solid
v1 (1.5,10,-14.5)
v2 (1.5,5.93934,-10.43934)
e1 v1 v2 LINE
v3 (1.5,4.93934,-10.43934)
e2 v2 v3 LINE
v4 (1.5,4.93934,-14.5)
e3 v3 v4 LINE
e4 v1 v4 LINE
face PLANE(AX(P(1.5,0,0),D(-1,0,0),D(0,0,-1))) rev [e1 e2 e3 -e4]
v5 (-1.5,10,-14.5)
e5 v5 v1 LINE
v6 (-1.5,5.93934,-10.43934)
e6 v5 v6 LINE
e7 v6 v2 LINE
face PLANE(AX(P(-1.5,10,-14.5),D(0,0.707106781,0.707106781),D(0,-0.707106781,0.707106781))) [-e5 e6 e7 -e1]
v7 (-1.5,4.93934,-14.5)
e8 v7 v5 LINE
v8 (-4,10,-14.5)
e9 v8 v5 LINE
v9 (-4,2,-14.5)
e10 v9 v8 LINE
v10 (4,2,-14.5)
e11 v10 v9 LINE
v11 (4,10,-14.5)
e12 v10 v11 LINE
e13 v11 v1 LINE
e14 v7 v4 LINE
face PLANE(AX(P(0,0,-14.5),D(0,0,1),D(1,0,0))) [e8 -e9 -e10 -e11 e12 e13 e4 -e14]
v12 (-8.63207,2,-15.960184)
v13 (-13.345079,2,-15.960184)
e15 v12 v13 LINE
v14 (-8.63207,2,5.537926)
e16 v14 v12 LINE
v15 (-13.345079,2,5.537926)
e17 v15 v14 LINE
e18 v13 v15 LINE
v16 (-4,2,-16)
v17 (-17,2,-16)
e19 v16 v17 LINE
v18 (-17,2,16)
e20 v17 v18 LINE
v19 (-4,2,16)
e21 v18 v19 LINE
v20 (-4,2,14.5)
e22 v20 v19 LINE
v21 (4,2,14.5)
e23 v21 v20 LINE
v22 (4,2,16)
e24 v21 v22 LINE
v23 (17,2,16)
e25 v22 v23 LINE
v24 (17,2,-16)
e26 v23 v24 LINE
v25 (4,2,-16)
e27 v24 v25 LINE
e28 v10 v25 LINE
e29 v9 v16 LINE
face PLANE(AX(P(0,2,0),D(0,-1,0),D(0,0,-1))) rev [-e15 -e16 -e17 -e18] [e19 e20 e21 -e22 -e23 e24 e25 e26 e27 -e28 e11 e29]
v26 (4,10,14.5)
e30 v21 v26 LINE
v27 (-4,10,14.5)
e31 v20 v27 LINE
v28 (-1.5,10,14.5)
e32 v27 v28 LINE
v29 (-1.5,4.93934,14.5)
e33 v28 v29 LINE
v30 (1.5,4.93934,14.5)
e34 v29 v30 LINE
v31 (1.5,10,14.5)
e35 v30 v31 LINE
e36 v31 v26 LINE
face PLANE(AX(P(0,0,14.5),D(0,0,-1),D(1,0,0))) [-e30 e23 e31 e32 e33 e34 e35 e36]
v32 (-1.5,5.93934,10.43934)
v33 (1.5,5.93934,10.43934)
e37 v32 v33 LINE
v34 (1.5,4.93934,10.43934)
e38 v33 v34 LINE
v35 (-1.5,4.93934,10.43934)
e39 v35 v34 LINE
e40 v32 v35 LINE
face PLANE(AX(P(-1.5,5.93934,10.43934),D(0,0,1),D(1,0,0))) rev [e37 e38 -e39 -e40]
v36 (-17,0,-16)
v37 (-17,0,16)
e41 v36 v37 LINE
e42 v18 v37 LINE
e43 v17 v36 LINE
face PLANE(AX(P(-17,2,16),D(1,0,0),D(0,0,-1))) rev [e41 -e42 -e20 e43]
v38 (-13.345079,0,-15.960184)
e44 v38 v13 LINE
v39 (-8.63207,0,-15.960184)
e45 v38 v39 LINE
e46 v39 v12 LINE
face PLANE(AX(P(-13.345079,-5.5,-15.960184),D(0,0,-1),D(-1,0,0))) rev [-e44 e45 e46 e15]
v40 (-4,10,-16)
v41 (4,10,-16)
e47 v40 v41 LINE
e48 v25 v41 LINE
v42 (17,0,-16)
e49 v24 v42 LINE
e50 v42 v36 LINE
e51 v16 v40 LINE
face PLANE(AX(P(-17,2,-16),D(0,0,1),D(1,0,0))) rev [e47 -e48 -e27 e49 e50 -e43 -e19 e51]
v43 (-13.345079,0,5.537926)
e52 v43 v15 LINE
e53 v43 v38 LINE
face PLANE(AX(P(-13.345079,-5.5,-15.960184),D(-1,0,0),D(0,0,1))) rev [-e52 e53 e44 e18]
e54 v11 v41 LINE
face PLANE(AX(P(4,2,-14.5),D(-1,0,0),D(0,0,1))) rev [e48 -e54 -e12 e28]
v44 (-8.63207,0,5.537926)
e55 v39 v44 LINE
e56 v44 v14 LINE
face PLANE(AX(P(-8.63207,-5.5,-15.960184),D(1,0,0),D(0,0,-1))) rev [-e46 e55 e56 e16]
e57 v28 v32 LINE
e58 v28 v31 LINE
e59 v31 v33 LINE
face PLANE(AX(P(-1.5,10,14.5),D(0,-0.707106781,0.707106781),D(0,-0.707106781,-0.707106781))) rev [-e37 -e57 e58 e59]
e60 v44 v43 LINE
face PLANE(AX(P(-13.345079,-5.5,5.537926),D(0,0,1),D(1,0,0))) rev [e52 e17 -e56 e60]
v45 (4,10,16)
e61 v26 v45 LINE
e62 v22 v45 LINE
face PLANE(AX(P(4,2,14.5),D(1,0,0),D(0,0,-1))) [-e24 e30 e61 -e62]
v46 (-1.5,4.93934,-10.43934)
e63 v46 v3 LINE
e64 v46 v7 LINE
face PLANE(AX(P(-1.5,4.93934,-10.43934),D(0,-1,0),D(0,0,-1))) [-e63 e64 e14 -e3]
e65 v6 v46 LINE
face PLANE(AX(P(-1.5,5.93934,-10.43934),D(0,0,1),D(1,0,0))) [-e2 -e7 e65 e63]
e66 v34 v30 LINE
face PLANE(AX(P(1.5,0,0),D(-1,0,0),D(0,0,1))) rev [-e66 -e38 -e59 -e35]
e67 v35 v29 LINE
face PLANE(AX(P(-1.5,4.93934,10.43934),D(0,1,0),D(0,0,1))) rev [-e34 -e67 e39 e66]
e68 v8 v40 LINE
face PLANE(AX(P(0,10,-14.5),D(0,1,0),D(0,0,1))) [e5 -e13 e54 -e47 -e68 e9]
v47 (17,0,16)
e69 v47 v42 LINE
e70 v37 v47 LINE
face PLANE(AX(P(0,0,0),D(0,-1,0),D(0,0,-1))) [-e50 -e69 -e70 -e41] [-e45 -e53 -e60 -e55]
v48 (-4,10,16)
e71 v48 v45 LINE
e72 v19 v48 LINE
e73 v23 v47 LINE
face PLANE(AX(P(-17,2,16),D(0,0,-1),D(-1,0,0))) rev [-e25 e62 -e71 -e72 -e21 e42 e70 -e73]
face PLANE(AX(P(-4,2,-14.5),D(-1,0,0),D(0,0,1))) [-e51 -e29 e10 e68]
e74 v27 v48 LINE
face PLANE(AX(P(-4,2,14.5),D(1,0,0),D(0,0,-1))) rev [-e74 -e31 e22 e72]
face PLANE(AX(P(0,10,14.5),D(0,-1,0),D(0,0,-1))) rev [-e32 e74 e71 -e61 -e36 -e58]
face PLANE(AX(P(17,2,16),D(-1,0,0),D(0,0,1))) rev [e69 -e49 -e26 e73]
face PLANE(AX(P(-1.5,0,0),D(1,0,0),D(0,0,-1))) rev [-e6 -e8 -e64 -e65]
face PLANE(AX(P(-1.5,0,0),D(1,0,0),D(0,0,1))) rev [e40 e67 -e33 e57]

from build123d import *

# Parameters (mm, degrees)
SKETCH1_W           = 34
SKETCH1_H           = 32
BOSS_EXTRUDE1_DEPTH = 2
SKETCH4_W           = 4
SKETCH4_H           = 8
BOSS_EXTRUDE2_DEPTH = 1.5
BOSS_EXTRUDE5_DEPTH = 1.5
MIRROR1_START       = -4
MIRROR1_OUTLINE_W   = 8
MIRROR1_OUTLINE_H   = 1.5
MIRROR1_DEPTH       = 8
MIRROR1_START_2     = -1.5
MIRROR1_2_DEPTH     = 3
SKETCH7_W           = 4.713008878
SKETCH7_H           = 21.4981103
CUT_EXTRUDE1_DEPTH  = 7.5


# Read off the part's stored shape, not the designer's step: Mirror1
with BuildPart() as part:
    # Sketch1 → Boss-Extrude1 (new body)
    with BuildSketch(Plane(origin=(0, 0, 0), x_dir=(1, 0, 0), z_dir=(0, 1, 0))):
        Rectangle(SKETCH1_W, SKETCH1_H)
    extrude(amount=BOSS_EXTRUDE1_DEPTH)

    # Sketch4 → Boss-Extrude2 (add)
    with BuildSketch(Plane(origin=(0, 0, -16), x_dir=(-1, 0, 0), z_dir=(0, 0, -1))):
        with Locations((2, 6)):
            Rectangle(SKETCH4_W, SKETCH4_H)
    extrude(amount=-BOSS_EXTRUDE2_DEPTH)

    # Sketch5 → Boss-Extrude5 (add)
    with BuildSketch(Plane(origin=(0, 0, 0), x_dir=(0, 0, -1), z_dir=(1, 0, 0))):
        Polygon((14.5, 10), (10.439339828, 5.939339828), (10.439339828, 4.939339828), (14.5, 4.939339828), (14.5, 2), (16, 2), (16, 10), align=None)
    extrude(amount=-BOSS_EXTRUDE5_DEPTH)

    # Mirror1 outline → Mirror1 (add)
    with BuildSketch(Plane.YZ.offset(MIRROR1_START)):
        with Locations((6, 15.25)):
            Rectangle(MIRROR1_OUTLINE_W, MIRROR1_OUTLINE_H)
        with Locations((6, -15.25)):
            Rectangle(MIRROR1_OUTLINE_W, MIRROR1_OUTLINE_H)
    extrude(amount=MIRROR1_DEPTH)

    # Mirror1 2 outline → Mirror1 2 (add)
    with BuildSketch(Plane.YZ.offset(MIRROR1_START_2)):
        Polygon((4.939339828, -14.5), (10, -14.5), (5.939339828, -10.439339828), (4.939339828, -10.439339828), align=None)
        Polygon((10, 14.5), (4.939339828, 14.5), (4.939339828, 10.439339828), (5.939339828, 10.439339828), align=None)
    extrude(amount=MIRROR1_2_DEPTH)

    # Sketch7 → Cut-Extrude1 (cut)
    with BuildSketch(Plane(origin=(0, 2, 0), x_dir=(1, 0, 0), z_dir=(0, 1, 0))):
        with Locations((-10.988574464, 5.211128947)):
            Rectangle(SKETCH7_W, SKETCH7_H)
    extrude(amount=-CUT_EXTRUDE1_DEPTH, mode=Mode.SUBTRACT)


solid = part.part
